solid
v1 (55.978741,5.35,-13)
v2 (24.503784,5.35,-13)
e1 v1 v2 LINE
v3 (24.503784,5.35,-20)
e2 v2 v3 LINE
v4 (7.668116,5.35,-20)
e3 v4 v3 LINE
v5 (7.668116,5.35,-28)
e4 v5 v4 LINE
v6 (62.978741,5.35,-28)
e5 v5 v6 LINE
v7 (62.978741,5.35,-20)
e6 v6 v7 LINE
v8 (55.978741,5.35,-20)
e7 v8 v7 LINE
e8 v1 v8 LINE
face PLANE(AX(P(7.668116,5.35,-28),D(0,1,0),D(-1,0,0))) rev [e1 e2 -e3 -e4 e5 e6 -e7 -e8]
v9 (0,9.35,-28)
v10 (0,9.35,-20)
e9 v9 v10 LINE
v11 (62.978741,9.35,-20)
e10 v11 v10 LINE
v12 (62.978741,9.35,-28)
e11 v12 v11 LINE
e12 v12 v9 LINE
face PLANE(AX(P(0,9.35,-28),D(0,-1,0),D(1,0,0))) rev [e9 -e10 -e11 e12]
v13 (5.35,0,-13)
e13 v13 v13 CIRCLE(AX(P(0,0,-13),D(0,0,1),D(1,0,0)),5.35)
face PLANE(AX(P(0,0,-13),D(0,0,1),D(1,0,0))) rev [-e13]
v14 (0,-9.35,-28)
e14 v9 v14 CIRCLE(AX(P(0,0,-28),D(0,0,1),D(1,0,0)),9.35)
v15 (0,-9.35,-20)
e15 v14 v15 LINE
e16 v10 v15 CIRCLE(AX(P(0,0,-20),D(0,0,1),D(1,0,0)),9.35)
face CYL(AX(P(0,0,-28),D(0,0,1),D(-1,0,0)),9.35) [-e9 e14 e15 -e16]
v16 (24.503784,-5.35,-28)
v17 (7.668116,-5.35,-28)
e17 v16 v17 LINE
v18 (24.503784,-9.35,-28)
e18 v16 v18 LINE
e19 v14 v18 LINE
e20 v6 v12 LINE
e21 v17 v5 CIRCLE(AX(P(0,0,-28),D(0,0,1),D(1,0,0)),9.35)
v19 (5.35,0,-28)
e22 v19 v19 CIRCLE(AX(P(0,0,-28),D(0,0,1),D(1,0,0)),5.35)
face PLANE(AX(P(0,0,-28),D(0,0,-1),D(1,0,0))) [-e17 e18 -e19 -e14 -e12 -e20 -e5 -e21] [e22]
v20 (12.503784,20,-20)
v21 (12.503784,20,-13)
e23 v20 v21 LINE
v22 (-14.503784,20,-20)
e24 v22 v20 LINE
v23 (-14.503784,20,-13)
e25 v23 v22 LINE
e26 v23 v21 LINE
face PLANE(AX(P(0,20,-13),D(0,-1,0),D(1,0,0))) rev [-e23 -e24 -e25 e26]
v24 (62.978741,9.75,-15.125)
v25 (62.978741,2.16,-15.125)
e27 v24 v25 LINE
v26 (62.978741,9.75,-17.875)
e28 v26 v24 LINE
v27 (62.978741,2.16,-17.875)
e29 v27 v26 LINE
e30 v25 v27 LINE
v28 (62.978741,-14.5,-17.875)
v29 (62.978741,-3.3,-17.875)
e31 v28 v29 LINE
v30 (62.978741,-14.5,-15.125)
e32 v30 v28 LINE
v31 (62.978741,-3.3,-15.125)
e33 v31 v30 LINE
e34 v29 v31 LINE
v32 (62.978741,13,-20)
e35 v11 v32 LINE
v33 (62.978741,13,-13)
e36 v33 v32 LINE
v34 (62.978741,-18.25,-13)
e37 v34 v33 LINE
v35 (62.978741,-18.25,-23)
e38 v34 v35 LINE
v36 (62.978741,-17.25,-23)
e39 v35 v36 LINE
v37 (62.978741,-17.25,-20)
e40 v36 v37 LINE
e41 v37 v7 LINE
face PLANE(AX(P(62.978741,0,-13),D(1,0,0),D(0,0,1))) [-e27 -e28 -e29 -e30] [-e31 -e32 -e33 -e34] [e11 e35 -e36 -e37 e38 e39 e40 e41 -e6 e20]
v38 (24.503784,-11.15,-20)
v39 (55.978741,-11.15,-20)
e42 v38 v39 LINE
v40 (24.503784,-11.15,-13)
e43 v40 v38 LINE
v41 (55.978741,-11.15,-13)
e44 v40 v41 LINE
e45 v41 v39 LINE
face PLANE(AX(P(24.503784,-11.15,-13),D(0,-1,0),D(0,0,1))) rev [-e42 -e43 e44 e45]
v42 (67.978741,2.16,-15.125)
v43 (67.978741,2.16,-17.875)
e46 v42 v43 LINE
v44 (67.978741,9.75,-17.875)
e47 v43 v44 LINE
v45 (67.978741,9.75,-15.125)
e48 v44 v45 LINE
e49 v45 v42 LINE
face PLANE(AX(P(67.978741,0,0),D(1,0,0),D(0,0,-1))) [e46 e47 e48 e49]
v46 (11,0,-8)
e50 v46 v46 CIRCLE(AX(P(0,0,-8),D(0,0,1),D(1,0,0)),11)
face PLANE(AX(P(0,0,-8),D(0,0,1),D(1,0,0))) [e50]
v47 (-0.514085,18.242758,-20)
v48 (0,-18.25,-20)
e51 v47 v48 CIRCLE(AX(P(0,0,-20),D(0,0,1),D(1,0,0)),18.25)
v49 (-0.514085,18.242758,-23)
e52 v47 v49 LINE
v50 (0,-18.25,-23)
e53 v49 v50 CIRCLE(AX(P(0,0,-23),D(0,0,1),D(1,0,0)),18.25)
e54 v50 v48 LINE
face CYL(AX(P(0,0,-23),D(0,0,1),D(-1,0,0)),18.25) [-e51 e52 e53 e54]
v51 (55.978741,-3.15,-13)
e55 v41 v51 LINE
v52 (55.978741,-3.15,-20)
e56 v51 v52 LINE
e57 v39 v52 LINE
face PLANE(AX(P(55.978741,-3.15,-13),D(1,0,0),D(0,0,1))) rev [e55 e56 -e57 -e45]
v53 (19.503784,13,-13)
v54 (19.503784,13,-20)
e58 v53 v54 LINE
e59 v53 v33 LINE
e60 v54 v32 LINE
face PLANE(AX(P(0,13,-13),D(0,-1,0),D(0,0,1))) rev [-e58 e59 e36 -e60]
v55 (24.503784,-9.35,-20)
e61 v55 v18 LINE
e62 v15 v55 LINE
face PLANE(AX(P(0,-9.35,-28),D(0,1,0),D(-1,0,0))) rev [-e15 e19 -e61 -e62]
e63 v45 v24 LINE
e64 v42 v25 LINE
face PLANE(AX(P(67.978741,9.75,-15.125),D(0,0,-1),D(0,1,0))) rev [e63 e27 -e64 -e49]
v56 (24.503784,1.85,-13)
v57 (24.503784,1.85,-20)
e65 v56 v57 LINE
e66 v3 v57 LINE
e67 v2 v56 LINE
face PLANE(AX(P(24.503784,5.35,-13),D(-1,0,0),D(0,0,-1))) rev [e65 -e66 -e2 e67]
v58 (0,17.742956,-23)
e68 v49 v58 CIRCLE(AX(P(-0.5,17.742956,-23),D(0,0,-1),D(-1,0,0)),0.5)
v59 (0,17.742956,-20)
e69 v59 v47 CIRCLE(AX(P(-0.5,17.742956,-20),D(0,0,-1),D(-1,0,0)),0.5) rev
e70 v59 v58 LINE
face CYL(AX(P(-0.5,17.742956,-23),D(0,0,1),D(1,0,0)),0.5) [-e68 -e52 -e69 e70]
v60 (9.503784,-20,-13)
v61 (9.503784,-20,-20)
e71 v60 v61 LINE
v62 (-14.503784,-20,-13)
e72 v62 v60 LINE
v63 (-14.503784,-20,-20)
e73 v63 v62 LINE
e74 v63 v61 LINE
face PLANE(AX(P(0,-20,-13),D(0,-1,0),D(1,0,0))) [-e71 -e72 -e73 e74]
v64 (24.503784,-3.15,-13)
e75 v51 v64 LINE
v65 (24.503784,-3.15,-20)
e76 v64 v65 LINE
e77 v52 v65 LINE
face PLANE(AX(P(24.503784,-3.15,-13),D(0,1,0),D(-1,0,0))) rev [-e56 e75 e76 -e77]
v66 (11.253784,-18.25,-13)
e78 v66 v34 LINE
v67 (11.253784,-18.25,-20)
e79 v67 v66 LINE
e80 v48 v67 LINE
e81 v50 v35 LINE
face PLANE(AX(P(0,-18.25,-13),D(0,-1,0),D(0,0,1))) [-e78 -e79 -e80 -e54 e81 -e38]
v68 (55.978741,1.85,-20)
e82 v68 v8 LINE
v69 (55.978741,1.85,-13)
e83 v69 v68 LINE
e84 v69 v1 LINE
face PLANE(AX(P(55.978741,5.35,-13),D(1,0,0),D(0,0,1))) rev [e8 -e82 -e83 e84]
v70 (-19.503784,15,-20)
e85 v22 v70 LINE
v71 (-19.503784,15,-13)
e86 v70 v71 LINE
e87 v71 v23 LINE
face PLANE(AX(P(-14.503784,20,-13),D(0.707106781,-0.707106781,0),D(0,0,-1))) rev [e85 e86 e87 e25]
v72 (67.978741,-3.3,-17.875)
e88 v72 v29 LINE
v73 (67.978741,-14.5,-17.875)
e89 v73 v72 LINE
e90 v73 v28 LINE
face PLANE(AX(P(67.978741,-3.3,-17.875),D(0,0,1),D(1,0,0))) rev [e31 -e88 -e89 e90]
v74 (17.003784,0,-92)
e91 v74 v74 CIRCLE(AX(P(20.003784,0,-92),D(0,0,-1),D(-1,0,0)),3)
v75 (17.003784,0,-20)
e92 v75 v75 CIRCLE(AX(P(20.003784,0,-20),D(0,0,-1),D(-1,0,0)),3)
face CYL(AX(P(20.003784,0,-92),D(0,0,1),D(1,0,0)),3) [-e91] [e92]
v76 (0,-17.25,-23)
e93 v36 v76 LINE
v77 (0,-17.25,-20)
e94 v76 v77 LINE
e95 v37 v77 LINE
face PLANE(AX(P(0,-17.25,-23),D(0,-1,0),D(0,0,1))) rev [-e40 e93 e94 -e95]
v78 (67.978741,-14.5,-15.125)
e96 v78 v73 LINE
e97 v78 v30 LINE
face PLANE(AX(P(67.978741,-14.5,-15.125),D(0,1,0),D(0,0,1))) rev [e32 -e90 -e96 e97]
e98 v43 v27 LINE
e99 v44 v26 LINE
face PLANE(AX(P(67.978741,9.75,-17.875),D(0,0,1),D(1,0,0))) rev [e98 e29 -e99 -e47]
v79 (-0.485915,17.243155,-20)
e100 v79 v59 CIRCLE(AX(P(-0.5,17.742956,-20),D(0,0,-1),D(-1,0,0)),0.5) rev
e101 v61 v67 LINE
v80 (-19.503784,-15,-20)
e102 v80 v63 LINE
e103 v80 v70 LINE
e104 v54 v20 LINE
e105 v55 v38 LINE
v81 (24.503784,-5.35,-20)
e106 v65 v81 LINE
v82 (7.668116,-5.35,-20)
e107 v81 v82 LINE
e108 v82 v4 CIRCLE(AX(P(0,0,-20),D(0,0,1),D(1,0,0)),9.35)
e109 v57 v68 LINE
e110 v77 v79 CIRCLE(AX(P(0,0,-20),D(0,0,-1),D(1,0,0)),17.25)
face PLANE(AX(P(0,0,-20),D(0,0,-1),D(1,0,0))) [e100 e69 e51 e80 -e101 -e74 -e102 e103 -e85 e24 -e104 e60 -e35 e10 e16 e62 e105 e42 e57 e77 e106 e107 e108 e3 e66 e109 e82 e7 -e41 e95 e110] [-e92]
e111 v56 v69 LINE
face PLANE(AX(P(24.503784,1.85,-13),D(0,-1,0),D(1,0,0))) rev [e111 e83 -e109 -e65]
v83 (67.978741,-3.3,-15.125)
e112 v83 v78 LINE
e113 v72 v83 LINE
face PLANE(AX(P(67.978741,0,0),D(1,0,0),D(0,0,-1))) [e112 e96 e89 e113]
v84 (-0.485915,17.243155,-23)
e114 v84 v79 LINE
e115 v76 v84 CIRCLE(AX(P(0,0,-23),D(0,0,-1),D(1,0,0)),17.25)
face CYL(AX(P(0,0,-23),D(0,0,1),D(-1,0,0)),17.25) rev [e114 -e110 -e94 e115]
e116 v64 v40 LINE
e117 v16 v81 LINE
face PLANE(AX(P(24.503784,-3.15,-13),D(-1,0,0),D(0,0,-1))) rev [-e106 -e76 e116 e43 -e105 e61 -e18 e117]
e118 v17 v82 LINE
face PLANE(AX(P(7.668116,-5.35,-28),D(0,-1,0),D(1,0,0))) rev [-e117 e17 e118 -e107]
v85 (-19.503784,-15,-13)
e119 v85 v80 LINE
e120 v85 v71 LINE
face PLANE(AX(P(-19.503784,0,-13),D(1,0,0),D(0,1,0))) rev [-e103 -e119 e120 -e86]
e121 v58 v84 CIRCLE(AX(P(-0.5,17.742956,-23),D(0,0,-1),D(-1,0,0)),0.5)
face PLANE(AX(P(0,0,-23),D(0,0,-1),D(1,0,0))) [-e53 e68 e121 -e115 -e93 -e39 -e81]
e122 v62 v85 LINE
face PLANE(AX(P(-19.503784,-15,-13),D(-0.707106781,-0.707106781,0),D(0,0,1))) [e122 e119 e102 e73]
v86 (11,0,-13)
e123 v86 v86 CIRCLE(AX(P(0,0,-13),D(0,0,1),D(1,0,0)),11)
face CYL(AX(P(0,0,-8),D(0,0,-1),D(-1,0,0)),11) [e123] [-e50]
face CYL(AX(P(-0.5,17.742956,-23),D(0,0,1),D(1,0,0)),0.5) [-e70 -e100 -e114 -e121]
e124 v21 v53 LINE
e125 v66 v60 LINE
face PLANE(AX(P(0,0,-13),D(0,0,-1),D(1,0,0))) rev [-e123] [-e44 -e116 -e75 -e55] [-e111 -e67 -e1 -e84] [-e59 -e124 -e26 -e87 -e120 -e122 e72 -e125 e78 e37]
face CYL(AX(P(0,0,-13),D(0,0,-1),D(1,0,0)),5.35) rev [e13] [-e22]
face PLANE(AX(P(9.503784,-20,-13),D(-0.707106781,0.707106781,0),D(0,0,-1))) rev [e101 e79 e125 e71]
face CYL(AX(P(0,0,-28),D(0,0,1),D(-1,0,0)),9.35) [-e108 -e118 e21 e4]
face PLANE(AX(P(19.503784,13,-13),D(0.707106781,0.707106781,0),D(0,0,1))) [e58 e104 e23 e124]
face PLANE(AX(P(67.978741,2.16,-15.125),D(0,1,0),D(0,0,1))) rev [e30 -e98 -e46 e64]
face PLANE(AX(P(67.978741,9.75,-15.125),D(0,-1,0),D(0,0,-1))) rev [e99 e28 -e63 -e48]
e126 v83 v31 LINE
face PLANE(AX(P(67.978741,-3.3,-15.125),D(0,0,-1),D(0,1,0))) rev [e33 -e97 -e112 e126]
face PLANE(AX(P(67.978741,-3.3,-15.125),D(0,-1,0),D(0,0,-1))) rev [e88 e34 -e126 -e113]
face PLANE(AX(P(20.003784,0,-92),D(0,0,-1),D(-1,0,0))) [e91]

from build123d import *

# Parameters (mm, degrees)
SKETCH1_R               = 5.35
BOSS_EXTRUDE2_DEPTH     = 7
BOSS_EXTRUDE3_START     = 8
SKETCH3_R               = 5.35
BOSS_EXTRUDE3_DEPTH     = 8
BOSS_EXTRUDE4_DEPTH     = 3
CHAMFER1_SIZE           = 10
CHAMFER2_SIZE           = 5
CUT_EXTRUDE1_DEPTH      = 67.560662475
CUT_EXTRUDE1_DEPTH_BACK = 67.560662475
SKETCH5_W               = 31.474956737
SKETCH5_H               = 3.5
SKETCH5_H_2             = 8
CHAMFER3_SIZE           = 7
SKETCH6_R               = 11
BOSS_EXTRUDE5_DEPTH     = 5
SKETCH8_W               = 2.75
SKETCH8_H               = 7.59
SKETCH8_H_2             = 11.2
BOSS_EXTRUDE6_DEPTH     = 5
SKETCH9_R               = 3
BOSS_EXTRUDE7_DEPTH     = 72
CUT_EXTRUDE2_REACH      = 127.169
SKETCH10_W              = 8
SKETCH10_H              = 4
FILLET1_R               = 0.5


# Some blends are built 0.0001 mm under size
with BuildPart() as part:
    # Sketch1 → Boss-Extrude2 (new body)
    with BuildSketch(Plane.XY):
        Polygon((-19.503784034, -20), (19.503784034, -20), (19.503784034, -18.25), (62.978740771, -18.25), (62.978740771, 13), (19.503784034, 13), (19.503784034, 20), (-19.503784034, 20), align=None)
        Circle(SKETCH1_R, mode=Mode.SUBTRACT)
    extrude(amount=-BOSS_EXTRUDE2_DEPTH)

    # Sketch3 → Boss-Extrude3 (add)
    with BuildSketch(Plane.XY.offset(BOSS_EXTRUDE3_START)):
        with BuildLine():
            Line((7.668115805, 5.35), (62.978740771, 5.35))
            Line((62.978740771, 5.35), (62.978740771, 9.35))
            Line((62.978740771, 9.35), (0, 9.35))
            ThreePointArc((0, 9.35), (-9.35, 0), (0, -9.35))
            Line((0, -9.35), (62.978740771, -9.35))
            Line((62.978740771, -9.35), (62.978740771, -5.35))
            Line((62.978740771, -5.35), (7.668115805, -5.35))
            ThreePointArc((7.668115805, -5.35), (9.35, 0), (7.668115805, 5.35))
        make_face()
        Circle(SKETCH3_R, mode=Mode.SUBTRACT)
    extrude(amount=-BOSS_EXTRUDE3_DEPTH)

    # Sketch4 → Boss-Extrude4 (add)
    with BuildSketch(Plane.XY):
        with BuildLine():
            Line((0, -18.25), (62.978740771, -18.25))
            Line((62.978740771, -18.25), (62.978740771, -17.25))
            Line((62.978740771, -17.25), (8.306623863, -17.25))
            Line((8.306623863, -17.25), (0, -17.25))
            ThreePointArc((0, -17.25), (-17.25, 0), (0, 17.25))
            Line((0, 17.25), (0, 18.25))
            ThreePointArc((0, 18.25), (-18.25, 0), (0, -18.25))
        make_face()
    extrude(amount=BOSS_EXTRUDE4_DEPTH)

    # Chamfer1
    # the kernel refuses this chamfer: 10 mm, written as the material it takes off along each edge
    with BuildSketch(Plane(origin=(19.503784034, -20, 25.71682988), x_dir=(-0.9996219169112968, -0.027495876610586317, 0), z_dir=(0, 0, -1))) as chamfer1_piece_1_section:
        Polygon((CHAMFER1_SIZE * 0.999621916911, CHAMFER1_SIZE * 0.0274958766106), (-CHAMFER1_SIZE * 0.0274958766106, CHAMFER1_SIZE * 0.999621916911), (0, 0), align=None)
    chamfer1_piece_1 = extrude(amount=58.433659759, mode=Mode.PRIVATE)
    chamfer1_piece_1 = split(chamfer1_piece_1, bisect_by=Plane(origin=(14.814200223, -18.25, -3.5), z_dir=(0, -1, 0)), keep=Keep.TOP, mode=Mode.PRIVATE)
    add(chamfer1_piece_1, mode=Mode.SUBTRACT)

    # Chamfer2
    chamfer2_edges = [part.edges().sort_by_distance(p)[0] for p in [
        (-19.503784034, -20, -3.5),
        (-19.503784034, 20, -3.5),
    ]]
    chamfer(chamfer2_edges, length=CHAMFER2_SIZE)

    # Sketch5 → Cut-Extrude1 (cut, two sides: drawn at the far end of the back side and taken through both)
    with BuildSketch(Plane.XY.offset(-CUT_EXTRUDE1_DEPTH_BACK)):
        with Locations((40.241262403, 3.6)):
            Rectangle(SKETCH5_W, SKETCH5_H)
        with Locations((40.241262403, -7.15)):
            Rectangle(SKETCH5_W, SKETCH5_H_2)
    extrude(amount=CUT_EXTRUDE1_DEPTH + CUT_EXTRUDE1_DEPTH_BACK, mode=Mode.SUBTRACT)

    # Chamfer3
    chamfer3_edges = [part.edges().sort_by_distance(p)[0] for p in [
        (19.503784034, 20, -3.5),
    ]]
    chamfer(chamfer3_edges, length=CHAMFER3_SIZE - 0.0001)  # a hair under: the kernel refuses the full size


with BuildPart() as body_2:
    # Mirror9: mirrored copy
    add(part.part.mirror(Plane.XY.offset(-10)))

    # Sketch6 → Boss-Extrude5 (add)
    with BuildSketch(Plane.XY.offset(-13)):
        Circle(SKETCH6_R)
    extrude(amount=BOSS_EXTRUDE5_DEPTH)

    # Sketch8 → Boss-Extrude6 (add)
    with BuildSketch(Plane(origin=(62.978740771, 0, 0), x_dir=(0, 0, -1), z_dir=(1, 0, 0))):
        with Locations((16.5, 5.955)):
            Rectangle(SKETCH8_W, SKETCH8_H)
        with Locations((16.5, -8.9)):
            Rectangle(SKETCH8_W, SKETCH8_H_2)
    extrude(amount=BOSS_EXTRUDE6_DEPTH)

    # Sketch9 → Boss-Extrude7 (add)
    with BuildSketch(Plane(origin=(0, 0, -20), x_dir=(-1, 0, 0), z_dir=(0, 0, -1))):
        with Locations((-20.003784034, 0)):
            Circle(SKETCH9_R)
    extrude(amount=BOSS_EXTRUDE7_DEPTH)

    # Sketch10 → Cut-Extrude2 (cut, up to next)
    with BuildSketch(Plane(origin=(62.978740771, 0, 0), x_dir=(0, 0, -1), z_dir=(1, 0, 0)), mode=Mode.PRIVATE) as cut_extrude2_sk1:
        with Locations((24, -7.35)):
            Rectangle(SKETCH10_W, SKETCH10_H)
    cut_extrude2_tool1 = extrude(cut_extrude2_sk1.sketch, amount=-CUT_EXTRUDE2_REACH, mode=Mode.PRIVATE) & body_2.part
    add(cut_extrude2_tool1.solids().sort_by_distance((62.978741, -7.35, -24))[0], mode=Mode.SUBTRACT)

    # Fillet1
    fillet1_edges = [body_2.edges().sort_by_distance(p)[0] for p in [
        (0, 18.25, -21.5),
        (0, 17.25, -21.5),
    ]]
    fillet(fillet1_edges, radius=FILLET1_R - 0.0001)  # a hair under: the kernel refuses the full size


solid = body_2.part
